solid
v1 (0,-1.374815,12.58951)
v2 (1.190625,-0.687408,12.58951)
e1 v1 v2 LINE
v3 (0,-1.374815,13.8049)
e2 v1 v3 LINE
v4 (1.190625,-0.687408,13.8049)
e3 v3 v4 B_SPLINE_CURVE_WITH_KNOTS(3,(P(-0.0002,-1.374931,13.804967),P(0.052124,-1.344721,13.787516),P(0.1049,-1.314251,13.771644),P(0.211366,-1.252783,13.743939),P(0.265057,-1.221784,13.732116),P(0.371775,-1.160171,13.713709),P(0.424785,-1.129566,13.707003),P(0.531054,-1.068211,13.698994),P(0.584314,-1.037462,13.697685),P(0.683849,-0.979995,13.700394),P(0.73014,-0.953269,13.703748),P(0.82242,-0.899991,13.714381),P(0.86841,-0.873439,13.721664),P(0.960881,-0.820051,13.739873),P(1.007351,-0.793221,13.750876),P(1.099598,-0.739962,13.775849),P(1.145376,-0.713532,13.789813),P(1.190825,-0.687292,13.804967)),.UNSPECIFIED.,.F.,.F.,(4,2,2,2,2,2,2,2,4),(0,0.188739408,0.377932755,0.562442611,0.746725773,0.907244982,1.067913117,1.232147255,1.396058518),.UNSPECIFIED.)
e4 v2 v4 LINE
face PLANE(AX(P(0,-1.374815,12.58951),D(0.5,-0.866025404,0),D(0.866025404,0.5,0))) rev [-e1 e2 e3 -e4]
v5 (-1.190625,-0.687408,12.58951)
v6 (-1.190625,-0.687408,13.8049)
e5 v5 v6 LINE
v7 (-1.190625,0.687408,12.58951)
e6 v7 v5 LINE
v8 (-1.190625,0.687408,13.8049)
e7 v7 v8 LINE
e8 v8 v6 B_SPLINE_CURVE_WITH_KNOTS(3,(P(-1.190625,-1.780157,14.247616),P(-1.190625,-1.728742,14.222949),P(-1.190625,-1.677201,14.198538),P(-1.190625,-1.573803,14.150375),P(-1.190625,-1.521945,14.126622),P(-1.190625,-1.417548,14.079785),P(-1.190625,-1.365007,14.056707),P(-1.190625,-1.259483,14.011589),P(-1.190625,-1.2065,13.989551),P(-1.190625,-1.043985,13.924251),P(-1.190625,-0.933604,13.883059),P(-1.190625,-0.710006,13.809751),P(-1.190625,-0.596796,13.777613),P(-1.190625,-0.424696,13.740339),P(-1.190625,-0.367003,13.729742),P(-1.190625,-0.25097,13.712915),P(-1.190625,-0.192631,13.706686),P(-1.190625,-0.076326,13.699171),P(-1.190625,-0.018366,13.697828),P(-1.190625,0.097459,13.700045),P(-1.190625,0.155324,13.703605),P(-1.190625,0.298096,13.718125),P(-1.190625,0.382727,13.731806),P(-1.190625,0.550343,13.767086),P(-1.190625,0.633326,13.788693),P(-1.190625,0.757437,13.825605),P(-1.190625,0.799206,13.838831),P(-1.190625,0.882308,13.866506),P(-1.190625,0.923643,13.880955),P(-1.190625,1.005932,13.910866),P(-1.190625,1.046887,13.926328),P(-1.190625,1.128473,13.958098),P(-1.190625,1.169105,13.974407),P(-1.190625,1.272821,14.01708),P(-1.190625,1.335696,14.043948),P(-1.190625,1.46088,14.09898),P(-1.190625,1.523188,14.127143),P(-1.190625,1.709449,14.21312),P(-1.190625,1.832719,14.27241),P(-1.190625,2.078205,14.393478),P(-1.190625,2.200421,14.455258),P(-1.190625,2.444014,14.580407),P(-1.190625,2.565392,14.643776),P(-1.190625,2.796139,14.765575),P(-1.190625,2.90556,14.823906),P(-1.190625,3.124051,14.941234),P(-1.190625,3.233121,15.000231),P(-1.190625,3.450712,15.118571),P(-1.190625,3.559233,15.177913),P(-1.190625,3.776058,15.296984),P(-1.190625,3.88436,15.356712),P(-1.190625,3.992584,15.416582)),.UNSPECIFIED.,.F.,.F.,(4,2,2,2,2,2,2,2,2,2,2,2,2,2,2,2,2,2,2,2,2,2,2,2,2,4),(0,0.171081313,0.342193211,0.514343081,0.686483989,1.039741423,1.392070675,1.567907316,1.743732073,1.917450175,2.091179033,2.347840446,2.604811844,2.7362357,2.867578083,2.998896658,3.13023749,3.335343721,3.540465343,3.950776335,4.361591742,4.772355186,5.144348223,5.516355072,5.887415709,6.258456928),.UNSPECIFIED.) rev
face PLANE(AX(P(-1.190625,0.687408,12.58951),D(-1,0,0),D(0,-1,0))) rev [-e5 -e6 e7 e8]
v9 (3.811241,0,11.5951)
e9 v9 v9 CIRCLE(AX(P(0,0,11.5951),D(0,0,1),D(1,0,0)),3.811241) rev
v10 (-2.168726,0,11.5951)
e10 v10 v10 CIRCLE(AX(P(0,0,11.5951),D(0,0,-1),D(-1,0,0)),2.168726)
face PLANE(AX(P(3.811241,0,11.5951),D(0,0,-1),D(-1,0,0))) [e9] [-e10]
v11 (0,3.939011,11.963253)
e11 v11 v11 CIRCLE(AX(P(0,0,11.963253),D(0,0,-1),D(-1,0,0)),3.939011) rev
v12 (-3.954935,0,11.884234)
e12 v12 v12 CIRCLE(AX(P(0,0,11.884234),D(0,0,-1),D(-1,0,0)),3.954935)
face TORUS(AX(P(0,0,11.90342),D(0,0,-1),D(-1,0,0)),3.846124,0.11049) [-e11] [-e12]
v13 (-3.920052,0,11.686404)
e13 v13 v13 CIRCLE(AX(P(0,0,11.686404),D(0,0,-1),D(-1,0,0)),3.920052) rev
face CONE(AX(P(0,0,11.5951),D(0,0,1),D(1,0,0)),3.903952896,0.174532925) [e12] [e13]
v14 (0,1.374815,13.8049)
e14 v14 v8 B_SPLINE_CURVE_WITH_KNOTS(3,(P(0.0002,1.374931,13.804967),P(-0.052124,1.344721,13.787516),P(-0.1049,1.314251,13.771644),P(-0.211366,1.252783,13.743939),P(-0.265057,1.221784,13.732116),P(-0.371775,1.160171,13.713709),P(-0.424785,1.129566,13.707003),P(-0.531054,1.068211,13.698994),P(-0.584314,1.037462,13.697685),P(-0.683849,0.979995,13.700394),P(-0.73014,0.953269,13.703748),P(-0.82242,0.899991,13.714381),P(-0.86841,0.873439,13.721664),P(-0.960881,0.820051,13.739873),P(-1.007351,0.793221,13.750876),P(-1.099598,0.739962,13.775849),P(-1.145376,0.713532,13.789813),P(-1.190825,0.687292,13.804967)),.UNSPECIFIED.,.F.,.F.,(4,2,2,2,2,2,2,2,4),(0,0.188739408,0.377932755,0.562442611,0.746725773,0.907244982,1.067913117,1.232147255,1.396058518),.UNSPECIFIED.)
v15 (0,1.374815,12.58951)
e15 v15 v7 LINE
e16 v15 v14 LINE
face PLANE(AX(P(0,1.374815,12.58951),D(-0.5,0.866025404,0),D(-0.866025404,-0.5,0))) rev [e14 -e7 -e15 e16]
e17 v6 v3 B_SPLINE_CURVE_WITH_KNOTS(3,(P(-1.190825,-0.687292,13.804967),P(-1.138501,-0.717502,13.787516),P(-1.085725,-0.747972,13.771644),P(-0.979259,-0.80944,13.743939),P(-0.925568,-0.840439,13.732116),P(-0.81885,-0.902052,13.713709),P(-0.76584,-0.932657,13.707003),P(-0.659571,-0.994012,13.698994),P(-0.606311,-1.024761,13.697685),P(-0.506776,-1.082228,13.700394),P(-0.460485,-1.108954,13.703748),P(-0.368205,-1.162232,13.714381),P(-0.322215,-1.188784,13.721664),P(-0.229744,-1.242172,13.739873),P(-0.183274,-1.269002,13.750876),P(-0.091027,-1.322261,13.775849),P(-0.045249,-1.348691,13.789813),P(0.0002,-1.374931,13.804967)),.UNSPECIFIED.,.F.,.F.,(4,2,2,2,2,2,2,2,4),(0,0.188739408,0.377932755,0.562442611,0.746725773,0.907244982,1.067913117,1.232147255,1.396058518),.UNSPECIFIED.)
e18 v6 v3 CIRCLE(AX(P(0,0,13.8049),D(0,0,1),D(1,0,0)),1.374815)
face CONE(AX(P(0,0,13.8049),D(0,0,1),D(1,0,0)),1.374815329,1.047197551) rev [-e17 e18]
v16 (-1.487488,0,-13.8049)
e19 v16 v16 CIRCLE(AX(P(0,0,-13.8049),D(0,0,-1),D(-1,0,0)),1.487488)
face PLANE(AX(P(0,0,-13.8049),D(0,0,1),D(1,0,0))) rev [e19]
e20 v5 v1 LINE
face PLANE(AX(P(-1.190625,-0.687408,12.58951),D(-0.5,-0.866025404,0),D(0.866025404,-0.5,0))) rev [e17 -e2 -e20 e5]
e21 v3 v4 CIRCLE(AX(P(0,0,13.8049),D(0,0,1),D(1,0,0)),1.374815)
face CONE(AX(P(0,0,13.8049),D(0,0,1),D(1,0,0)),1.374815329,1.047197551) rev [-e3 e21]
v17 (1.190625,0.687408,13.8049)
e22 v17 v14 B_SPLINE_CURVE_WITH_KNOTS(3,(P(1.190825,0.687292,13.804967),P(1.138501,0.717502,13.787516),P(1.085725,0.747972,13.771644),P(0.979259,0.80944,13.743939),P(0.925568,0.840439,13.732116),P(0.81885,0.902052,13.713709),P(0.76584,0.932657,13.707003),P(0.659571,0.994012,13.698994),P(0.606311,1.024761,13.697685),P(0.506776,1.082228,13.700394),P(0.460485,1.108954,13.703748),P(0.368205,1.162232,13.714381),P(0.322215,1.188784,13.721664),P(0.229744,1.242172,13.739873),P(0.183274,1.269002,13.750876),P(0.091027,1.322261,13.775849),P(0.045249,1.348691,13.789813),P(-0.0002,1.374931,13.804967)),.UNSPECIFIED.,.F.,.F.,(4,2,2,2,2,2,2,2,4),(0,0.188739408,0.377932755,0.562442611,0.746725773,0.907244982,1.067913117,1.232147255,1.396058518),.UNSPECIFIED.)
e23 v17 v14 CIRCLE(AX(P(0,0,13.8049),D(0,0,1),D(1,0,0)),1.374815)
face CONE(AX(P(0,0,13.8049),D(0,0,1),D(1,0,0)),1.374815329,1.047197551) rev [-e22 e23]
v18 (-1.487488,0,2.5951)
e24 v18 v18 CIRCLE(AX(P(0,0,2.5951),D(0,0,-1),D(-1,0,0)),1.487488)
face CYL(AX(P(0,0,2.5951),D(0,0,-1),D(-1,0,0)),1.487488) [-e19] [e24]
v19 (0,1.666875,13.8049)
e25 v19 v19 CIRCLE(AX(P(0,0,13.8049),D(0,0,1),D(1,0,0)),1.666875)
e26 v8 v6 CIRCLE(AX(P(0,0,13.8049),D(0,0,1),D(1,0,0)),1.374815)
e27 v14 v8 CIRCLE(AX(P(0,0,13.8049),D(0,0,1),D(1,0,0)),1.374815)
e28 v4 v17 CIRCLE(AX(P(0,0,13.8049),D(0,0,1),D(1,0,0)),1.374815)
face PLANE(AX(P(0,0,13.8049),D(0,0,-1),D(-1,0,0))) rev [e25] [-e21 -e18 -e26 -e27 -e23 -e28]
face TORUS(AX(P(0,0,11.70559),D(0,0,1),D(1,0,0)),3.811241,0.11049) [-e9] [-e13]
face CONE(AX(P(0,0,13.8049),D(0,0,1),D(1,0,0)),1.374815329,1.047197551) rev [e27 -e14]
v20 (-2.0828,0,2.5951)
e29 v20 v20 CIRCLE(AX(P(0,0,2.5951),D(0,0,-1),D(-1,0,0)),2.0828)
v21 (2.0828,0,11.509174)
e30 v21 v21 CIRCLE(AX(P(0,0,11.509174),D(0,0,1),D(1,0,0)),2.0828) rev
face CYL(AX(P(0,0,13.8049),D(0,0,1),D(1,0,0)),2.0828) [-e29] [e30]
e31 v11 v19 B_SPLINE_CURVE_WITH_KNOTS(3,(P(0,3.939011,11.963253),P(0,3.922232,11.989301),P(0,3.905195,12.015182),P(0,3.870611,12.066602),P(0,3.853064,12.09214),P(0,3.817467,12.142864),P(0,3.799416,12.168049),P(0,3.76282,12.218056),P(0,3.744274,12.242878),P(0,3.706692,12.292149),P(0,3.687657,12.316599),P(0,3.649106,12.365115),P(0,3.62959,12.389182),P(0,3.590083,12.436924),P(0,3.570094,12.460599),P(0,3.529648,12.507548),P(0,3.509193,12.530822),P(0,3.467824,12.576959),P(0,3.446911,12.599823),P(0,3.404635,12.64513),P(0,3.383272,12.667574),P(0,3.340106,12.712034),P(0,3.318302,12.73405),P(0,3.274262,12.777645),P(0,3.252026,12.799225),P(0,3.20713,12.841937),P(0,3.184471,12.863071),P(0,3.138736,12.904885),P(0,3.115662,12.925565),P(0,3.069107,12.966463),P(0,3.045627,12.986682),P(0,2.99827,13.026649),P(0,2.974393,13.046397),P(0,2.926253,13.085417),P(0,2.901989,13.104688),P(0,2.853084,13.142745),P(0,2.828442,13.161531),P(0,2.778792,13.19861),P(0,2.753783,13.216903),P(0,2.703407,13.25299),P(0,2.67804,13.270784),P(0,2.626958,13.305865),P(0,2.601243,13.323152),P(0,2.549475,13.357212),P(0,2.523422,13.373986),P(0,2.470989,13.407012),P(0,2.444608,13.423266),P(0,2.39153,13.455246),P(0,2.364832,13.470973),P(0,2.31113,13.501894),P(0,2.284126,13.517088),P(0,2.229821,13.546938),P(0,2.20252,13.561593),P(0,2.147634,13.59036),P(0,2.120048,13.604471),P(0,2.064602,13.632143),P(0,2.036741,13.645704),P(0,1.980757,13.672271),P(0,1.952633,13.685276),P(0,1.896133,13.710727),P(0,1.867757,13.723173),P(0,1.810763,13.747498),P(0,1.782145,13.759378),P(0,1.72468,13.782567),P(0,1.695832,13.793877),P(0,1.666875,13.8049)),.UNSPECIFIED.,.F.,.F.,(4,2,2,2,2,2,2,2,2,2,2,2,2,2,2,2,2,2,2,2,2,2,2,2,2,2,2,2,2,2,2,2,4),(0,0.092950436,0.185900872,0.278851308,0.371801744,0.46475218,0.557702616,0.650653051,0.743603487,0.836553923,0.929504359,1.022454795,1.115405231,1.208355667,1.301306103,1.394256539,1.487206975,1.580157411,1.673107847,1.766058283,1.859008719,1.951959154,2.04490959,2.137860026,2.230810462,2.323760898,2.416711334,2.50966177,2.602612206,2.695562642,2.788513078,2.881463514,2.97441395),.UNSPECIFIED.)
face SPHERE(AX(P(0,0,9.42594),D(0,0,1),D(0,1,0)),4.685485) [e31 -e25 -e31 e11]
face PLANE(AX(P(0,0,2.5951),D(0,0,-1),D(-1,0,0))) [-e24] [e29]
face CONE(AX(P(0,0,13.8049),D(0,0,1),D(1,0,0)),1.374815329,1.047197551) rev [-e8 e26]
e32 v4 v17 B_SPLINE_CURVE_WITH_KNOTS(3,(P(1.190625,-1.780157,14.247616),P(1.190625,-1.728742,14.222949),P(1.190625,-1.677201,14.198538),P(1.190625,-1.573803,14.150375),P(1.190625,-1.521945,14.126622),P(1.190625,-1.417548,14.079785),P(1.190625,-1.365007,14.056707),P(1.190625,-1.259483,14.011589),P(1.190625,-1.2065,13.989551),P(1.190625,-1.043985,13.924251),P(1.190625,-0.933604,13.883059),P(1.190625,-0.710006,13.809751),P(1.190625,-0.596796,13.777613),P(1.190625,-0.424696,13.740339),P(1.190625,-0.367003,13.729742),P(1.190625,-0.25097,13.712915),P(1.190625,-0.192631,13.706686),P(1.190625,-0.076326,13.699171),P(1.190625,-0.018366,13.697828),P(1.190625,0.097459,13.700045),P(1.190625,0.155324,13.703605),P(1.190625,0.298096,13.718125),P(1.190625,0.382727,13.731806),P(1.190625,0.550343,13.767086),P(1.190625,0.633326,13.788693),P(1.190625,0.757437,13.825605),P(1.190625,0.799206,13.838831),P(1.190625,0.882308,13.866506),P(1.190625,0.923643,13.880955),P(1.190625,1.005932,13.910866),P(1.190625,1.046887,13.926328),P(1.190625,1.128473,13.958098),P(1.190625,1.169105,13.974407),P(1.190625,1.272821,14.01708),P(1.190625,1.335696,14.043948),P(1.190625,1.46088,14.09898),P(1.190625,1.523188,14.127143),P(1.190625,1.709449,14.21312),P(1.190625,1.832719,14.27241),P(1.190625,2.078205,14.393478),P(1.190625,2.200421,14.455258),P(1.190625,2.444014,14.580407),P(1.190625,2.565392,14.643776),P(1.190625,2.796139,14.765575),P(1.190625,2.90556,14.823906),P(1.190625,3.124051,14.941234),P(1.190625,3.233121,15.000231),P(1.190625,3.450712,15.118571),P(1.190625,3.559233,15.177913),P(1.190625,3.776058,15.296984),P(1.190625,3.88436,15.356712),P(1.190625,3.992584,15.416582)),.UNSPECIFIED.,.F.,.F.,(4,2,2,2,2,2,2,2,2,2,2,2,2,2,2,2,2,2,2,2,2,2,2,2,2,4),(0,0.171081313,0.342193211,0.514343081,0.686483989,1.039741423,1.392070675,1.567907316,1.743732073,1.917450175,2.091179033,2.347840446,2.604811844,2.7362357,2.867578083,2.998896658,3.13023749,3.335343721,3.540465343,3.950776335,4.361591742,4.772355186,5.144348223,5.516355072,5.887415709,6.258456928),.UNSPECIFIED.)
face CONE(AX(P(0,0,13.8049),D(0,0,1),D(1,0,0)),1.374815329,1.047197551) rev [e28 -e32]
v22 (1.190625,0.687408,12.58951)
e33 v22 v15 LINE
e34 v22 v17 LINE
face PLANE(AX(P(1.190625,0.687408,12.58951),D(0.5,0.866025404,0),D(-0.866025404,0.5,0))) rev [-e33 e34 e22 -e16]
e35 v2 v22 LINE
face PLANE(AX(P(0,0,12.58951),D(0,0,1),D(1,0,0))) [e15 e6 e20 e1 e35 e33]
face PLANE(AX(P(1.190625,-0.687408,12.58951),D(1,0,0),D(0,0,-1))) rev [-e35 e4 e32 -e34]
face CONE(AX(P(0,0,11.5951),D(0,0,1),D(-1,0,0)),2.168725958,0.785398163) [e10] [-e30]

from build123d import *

# Parameters (mm, degrees)
CUT_EXTRUDE1_DEPTH = 1.21539
FILLET1_R          = 0.11049
SKETCH10_R         = 3.811240777
SKETCH10_R_2       = 1.4874875
CUT_EXTRUDE4_DEPTH = 16.4


# Read off the part's stored shape, not the designer's step: Split1
with BuildPart() as part:
    # Sketch3 → Revolve1 (revolve)
    with BuildSketch(Plane(origin=(0, 0, 0), x_dir=(0, 0, -1), z_dir=(1, 0, 0)), mode=Mode.PRIVATE) as revolve1_sk:
        with BuildLine():
            Line((-13.8049, 0), (-13.8049, 1.666875))
            ThreePointArc((-13.8049, 1.666875), (-13.052170588, 2.967189774), (-11.92657, 3.9624))
            Line((-11.92657, 3.9624), (-11.5951, 3.903952896))
            Line((-11.5951, 3.903952896), (-11.5951, 2.0828))
            Line((-11.5951, 2.0828), (13.2095875, 2.0828))
            Line((13.2095875, 2.0828), (13.8049, 1.4874875))
            Line((13.8049, 1.4874875), (13.8049, 0))
            Line((13.8049, 0), (-13.8049, 0))
        make_face()
    revolve(revolve1_sk.sketch.rotate(Axis((0, 0, 13.8049), (0, 0, -1)), 90), axis=Axis((0, 0, 13.8049), (0, 0, -1)))

    # Sketch4 → Cut-Extrude1 (cut)
    with BuildSketch(Plane.XY.offset(13.8049)):
        Polygon((-1.190625, -0.687407664), (0, -1.374815329), (1.190625, -0.687407664), (1.190625, 0.687407664), (0, 1.374815329), (-1.190625, 0.687407664), align=None)
    extrude(amount=-CUT_EXTRUDE1_DEPTH, mode=Mode.SUBTRACT)

    # Cut-Extrude2 cone 1 section (through the dimple's axis) → Cut-Extrude2 (revolve, cut)
    with BuildSketch(Plane(origin=(0, 0, 13.8049), x_dir=(0, -1, 0), z_dir=(1, 0, 0))):
        Polygon((0, 0), (1.374815329, 0), (0, 0.79375), align=None)
    revolve(axis=Axis((0, 0, 13.8049), (0, 0, -1)), mode=Mode.SUBTRACT)

    # Fillet1
    fillet1_edges = [part.edges().sort_by_distance(p)[0] for p in [
        (-3.903952896, 0, 11.5951),
        (-3.9624, 0, 11.92657),
    ]]
    fillet(fillet1_edges, radius=FILLET1_R)


with BuildPart() as body_2:
    # Split1: the piece on the far side of the plane
    add(part.part)
    split(bisect_by=Plane.XY.offset(11.5951), keep=Keep.BOTTOM)


with BuildPart() as part_1:
    add(part.part)

    # Split1
    split(bisect_by=Plane.XY.offset(11.5951), keep=Keep.TOP)

    add(body_2.part)  # Boss-Extrude1 merges body 2
    # Boss-Extrude1 cone 1 section (through the dimple's axis) → Boss-Extrude1 (revolve)
    with BuildSketch(Plane(origin=(0, 0, 11.5951), x_dir=(0, -1, 0), z_dir=(1, 0, 0))):
        Polygon((0, 0), (2.168725958, 0), (0, 2.168725958), align=None)
    revolve(axis=Axis((0, 0, 11.5951), (0, 0, -1)))

    # Sketch10 → Cut-Extrude4 (cut)
    with BuildSketch(Plane(origin=(0, 0, -13.8049), x_dir=(-1, 0, 0), z_dir=(0, 0, -1))):
        Circle(SKETCH10_R)
        Circle(SKETCH10_R_2, mode=Mode.SUBTRACT)
    extrude(amount=-CUT_EXTRUDE4_DEPTH, mode=Mode.SUBTRACT)


solid = part_1.part
